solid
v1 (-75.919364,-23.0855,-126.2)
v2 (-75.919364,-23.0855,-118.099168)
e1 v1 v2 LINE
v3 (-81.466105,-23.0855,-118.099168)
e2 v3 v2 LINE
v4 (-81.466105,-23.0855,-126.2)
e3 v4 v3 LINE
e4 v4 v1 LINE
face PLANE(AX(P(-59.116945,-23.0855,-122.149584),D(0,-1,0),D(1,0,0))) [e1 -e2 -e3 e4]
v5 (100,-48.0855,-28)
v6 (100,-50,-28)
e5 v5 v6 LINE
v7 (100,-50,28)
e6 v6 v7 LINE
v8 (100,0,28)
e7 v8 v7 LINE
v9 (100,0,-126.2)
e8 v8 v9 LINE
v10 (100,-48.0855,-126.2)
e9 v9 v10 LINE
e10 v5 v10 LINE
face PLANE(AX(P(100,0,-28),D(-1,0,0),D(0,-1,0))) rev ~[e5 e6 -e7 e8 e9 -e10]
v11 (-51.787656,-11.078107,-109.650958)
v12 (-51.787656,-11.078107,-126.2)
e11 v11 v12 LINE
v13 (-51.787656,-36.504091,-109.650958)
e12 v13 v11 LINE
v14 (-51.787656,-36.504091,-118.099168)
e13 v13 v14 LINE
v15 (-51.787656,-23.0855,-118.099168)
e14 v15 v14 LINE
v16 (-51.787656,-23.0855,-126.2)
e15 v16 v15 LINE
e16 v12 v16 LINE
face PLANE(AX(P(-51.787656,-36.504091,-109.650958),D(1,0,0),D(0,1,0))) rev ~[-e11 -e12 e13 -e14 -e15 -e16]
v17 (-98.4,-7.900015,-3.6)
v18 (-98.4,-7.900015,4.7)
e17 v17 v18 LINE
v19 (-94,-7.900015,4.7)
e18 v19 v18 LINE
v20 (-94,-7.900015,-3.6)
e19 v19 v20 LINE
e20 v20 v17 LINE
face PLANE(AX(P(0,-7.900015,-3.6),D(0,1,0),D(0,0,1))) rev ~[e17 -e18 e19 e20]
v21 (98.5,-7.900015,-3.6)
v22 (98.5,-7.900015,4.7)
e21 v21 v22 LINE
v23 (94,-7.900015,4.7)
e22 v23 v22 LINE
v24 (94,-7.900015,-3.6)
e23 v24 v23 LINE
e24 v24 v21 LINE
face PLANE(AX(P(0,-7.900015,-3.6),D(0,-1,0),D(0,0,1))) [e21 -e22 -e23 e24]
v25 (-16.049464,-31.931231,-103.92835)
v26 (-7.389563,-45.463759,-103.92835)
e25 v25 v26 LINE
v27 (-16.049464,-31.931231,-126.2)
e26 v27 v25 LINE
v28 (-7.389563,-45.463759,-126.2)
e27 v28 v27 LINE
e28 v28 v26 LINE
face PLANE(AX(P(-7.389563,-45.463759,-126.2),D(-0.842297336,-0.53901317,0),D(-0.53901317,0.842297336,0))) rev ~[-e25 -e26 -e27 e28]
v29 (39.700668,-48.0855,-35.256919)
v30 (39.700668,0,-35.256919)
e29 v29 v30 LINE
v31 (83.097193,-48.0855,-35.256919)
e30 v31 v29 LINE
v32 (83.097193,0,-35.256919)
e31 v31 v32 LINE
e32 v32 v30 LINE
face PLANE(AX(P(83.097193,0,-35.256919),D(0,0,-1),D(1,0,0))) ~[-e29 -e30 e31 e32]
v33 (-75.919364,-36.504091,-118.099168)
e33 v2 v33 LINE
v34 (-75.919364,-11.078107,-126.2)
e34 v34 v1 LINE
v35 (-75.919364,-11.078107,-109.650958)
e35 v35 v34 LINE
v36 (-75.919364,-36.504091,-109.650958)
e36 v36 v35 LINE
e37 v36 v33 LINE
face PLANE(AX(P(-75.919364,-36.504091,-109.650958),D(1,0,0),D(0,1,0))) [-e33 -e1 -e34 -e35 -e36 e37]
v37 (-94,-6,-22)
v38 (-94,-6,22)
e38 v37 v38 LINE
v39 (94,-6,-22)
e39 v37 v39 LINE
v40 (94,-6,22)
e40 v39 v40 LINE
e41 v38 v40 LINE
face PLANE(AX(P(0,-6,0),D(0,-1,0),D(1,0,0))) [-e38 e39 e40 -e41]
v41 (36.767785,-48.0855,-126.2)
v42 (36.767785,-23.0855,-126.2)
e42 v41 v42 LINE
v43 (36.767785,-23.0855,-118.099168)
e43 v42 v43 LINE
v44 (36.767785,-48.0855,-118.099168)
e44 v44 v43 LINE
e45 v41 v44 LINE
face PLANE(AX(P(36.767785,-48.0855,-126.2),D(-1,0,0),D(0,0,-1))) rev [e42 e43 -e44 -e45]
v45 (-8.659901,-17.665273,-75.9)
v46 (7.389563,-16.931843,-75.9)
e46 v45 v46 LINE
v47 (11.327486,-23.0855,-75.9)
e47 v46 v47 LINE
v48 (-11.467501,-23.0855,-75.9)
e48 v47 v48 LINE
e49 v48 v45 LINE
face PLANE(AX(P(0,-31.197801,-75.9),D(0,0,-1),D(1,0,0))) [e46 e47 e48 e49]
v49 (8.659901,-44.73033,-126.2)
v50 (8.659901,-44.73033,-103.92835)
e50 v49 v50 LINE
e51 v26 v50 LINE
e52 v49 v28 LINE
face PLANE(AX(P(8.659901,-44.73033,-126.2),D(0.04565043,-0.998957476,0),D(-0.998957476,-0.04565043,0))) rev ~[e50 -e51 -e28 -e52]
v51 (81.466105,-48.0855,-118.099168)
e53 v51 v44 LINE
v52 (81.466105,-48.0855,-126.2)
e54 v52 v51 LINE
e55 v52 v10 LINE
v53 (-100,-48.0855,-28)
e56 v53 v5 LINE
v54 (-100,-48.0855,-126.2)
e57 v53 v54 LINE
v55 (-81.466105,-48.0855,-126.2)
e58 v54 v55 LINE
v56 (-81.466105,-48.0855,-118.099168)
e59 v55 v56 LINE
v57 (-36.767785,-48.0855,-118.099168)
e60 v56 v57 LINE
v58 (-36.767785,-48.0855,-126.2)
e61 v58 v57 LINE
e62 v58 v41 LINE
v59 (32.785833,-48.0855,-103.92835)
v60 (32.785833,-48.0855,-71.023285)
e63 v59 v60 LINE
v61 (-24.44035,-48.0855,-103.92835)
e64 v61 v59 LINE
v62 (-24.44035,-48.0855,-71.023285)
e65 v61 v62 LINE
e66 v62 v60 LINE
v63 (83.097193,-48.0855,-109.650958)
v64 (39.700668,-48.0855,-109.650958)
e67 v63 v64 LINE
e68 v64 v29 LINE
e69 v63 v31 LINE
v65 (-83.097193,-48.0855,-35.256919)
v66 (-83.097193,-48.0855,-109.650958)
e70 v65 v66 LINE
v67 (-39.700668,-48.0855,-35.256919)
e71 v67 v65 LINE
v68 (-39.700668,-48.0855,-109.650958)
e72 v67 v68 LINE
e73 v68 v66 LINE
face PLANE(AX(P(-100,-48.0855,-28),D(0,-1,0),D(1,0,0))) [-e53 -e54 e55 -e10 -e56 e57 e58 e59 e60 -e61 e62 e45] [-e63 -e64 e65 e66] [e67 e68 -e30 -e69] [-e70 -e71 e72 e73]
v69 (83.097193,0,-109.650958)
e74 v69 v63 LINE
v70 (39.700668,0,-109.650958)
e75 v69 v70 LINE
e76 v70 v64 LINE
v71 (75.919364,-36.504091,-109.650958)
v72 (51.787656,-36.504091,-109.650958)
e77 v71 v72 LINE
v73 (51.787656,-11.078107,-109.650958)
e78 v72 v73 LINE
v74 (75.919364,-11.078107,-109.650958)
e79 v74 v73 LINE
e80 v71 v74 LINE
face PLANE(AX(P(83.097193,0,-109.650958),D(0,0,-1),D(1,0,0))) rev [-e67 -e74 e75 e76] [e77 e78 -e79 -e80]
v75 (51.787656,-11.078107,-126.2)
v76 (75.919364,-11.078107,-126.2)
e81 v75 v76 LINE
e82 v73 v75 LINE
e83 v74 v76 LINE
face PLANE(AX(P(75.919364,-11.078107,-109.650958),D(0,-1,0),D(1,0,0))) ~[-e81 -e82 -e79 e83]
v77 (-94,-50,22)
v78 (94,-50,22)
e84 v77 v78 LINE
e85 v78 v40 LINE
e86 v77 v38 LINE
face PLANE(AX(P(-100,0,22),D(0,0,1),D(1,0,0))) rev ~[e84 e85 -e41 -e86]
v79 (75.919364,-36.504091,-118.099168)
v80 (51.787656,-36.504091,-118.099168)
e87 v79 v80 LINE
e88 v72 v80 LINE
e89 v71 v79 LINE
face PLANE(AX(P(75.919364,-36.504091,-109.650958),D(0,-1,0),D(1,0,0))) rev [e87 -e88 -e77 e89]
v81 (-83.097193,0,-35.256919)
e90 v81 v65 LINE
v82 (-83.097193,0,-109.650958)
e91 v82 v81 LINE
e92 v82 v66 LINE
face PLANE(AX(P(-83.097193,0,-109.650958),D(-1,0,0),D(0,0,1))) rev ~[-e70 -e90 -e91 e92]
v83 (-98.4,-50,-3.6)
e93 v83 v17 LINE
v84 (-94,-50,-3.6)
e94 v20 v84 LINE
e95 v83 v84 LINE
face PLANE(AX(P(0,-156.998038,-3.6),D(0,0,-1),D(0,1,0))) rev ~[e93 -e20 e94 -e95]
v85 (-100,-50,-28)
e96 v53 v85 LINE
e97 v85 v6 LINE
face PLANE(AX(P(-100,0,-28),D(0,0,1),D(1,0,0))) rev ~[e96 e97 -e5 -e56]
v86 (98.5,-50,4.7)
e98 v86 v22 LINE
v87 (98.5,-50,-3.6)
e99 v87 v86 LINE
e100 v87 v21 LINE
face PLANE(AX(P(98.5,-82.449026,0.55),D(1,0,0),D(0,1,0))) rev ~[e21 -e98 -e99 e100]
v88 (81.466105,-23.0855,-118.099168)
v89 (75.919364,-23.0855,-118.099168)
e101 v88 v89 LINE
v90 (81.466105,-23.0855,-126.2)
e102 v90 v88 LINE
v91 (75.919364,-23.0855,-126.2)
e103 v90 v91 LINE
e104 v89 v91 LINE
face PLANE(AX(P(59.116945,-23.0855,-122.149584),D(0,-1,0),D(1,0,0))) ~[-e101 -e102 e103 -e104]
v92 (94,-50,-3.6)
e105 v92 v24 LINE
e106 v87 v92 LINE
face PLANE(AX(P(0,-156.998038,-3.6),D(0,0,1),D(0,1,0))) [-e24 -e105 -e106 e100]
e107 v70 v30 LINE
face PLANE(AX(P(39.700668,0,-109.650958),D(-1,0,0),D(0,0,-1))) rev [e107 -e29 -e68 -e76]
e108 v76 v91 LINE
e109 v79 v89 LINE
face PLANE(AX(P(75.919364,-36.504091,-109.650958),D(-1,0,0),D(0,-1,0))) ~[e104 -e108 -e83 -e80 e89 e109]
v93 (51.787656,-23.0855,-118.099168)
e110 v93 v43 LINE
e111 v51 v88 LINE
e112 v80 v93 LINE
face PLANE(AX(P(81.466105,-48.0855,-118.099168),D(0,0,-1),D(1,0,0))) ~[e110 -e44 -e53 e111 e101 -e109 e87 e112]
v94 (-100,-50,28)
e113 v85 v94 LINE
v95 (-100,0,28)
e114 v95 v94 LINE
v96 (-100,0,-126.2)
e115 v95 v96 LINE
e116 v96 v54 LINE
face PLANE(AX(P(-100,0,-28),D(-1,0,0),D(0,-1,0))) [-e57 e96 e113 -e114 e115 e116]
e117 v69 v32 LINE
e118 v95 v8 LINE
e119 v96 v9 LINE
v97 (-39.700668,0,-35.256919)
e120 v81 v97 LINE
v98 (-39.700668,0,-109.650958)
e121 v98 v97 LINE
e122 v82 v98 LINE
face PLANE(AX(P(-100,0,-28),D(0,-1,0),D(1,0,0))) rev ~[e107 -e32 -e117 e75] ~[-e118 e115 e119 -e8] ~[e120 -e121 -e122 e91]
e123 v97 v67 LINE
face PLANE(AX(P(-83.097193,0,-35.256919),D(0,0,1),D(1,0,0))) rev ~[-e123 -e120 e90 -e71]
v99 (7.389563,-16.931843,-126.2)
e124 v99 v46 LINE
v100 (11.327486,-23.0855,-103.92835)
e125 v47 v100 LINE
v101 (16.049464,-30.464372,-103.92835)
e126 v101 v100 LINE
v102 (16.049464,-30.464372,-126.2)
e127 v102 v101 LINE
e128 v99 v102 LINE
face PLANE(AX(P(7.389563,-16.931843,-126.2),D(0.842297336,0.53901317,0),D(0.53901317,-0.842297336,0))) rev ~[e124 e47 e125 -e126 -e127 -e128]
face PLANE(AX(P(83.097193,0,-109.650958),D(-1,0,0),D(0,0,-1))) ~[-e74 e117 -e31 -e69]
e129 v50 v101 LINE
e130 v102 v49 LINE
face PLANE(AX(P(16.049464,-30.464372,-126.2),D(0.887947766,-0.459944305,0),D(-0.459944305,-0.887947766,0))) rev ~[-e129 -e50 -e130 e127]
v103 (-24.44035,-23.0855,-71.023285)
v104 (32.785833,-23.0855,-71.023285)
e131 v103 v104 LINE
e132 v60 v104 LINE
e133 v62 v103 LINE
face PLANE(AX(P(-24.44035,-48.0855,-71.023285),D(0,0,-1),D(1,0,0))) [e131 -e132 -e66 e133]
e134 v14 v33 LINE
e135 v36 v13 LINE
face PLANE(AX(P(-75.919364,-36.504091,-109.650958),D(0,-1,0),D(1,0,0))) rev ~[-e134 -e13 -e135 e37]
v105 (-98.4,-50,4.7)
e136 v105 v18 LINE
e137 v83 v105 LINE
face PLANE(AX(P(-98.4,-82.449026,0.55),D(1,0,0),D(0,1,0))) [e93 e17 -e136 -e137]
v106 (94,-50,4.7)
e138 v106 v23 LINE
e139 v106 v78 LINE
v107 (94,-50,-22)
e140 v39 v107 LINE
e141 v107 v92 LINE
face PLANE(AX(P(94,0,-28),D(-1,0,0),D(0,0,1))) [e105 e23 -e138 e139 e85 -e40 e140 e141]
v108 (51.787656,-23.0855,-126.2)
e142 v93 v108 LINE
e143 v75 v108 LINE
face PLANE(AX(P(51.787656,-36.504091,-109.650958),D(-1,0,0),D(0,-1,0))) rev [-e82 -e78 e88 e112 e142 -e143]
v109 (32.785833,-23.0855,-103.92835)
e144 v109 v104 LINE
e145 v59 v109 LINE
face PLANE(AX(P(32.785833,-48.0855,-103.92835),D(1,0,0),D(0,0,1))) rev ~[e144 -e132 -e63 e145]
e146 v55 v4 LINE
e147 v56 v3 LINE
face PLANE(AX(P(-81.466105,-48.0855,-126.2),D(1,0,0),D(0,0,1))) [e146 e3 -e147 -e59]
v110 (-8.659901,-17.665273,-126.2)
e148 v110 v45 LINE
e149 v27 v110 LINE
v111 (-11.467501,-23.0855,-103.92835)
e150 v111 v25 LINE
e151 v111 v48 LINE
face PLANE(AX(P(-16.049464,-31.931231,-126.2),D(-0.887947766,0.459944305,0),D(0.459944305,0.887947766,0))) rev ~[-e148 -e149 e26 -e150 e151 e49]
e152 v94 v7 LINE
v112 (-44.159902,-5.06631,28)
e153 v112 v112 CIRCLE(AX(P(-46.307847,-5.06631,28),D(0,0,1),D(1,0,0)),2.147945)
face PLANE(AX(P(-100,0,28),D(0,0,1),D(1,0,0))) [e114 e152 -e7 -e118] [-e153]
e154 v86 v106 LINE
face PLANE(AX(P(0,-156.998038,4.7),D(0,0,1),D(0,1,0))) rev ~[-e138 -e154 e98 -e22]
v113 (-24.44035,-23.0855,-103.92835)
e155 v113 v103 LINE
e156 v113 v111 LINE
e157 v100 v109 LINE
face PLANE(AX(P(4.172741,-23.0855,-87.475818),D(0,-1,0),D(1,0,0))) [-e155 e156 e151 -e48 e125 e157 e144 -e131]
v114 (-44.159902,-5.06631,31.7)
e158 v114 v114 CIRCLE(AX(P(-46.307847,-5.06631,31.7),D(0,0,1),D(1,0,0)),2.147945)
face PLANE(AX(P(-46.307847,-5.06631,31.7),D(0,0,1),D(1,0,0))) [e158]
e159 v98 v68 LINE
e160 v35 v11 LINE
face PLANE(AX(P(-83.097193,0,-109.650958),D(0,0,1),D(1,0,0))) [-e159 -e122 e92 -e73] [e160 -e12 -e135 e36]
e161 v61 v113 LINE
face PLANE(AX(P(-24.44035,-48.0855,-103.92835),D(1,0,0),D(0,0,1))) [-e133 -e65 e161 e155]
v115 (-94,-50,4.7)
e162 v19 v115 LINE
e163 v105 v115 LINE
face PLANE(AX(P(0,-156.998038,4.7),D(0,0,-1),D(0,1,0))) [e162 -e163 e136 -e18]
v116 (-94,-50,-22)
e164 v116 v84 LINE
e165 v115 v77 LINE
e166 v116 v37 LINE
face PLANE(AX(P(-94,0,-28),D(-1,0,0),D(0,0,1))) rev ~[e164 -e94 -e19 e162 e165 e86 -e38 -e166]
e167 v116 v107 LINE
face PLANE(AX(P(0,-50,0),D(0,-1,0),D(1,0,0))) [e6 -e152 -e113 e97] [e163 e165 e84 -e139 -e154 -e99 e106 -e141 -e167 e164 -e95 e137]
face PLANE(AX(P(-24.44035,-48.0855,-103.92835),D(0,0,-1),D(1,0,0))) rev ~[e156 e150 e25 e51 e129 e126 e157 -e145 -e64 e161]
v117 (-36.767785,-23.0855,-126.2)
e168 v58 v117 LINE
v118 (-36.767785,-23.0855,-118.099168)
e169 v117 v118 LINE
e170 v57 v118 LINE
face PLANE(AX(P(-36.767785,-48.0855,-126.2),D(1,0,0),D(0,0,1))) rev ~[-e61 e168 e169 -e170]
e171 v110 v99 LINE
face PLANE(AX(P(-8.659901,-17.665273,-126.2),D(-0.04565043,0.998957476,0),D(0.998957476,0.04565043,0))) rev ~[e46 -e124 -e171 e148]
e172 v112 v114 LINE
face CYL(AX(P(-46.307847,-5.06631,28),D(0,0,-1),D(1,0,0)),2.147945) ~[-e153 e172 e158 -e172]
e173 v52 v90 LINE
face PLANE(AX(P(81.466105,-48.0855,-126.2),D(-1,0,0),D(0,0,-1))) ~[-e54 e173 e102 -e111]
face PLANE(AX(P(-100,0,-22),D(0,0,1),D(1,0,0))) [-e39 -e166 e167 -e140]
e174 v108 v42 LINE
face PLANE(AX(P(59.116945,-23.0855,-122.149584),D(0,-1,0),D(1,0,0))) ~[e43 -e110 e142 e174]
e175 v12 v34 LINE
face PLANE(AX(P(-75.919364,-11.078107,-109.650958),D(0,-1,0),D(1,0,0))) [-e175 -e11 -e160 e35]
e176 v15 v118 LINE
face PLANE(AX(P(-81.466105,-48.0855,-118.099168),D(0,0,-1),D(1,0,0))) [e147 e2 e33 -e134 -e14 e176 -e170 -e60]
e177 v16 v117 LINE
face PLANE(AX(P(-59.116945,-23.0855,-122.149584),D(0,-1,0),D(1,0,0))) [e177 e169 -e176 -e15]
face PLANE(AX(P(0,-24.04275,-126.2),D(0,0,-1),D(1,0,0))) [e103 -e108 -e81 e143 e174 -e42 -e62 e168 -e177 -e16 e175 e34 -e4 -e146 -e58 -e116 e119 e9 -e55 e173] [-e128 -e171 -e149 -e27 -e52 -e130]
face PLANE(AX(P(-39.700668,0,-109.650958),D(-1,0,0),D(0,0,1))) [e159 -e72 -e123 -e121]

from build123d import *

# Parameters (mm, degrees)
F0_W           = 200
F0_H           = 56
F1_DEPTH       = 50
F2_T           = -6
F3_W           = 149.0980237722
F3_H           = 8.3
F4_DEPTH       = 98.5
F4_DEPTH_BACK  = 98.4
F5_R           = 2.1479446761
F6_DEPTH       = 3.7
F7_W           = 200
F7_H           = 48.0854995549
F8_DEPTH       = 98.2
F9_W           = 44.6983203292
F9_H           = 8.100832057
F10_DEPTH      = 25
F11_W          = 43.396525085
F11_H          = 74.3940398097
F12_DEPTH      = 55.1
F12_DEPTH_BACK = 75
F13_W          = 24.1317078471
F13_H          = 25.4259835929
F14_DEPTH      = 29.4
F16_DEPTH      = 50.3
F17_W          = 57.2261828929
F17_H          = 32.9050645232
F18_DEPTH      = 25


# Not quite as in the source:
# - a pattern or mirror of a feature is missing from the dataset's text; its kind, count and spacing are read off the source's solid


with BuildPart() as f1:
    # F0 (on Front) → F1 (new body)
    with BuildSketch(Plane.XZ):
        Rectangle(F0_W, F0_H)
    extrude(amount=F1_DEPTH)

    # F2
    f2_openings = [f1.faces().sort_by_distance(p)[0] for p in [
        (0, -50, 0),
    ]]
    offset(amount=F2_T, openings=f2_openings)

    # F3 (on Right) → F4 (cut, two sides)
    with BuildSketch(Plane.YZ) as f4_sk:
        with Locations((-82.4490264058, 0.55)):
            Rectangle(F3_W, F3_H)
    extrude(amount=F4_DEPTH, mode=Mode.SUBTRACT)
    extrude(f4_sk.sketch, amount=-F4_DEPTH_BACK, mode=Mode.SUBTRACT)

    # F5 (on face) → F6 (join)
    with BuildSketch(Plane.XY.offset(28)):
        with Locations((-46.3078469038, -5.0663095899)):
            Circle(F5_R)
    extrude(amount=F6_DEPTH)

    # F7 (on face) → F8 (join)
    with BuildSketch(Plane(origin=(0, 0, -28), x_dir=(1, 0, 0), z_dir=(0, 0, -1))):
        with Locations((0, 24.0427497774)):
            Rectangle(F7_W, F7_H)
    extrude(amount=F8_DEPTH)

    # F9 (on face) → F10 (cut)
    with BuildSketch(Plane.XZ.offset(48.0854995549)):
        with Locations((-59.1169446707, -122.1495839715)):
            Rectangle(F9_W, F9_H)
    f10 = extrude(amount=-F10_DEPTH, mode=Mode.SUBTRACT)

    # F10_copies: F10 across plane
    add(f10.mirror(Plane(origin=(0, 0, 0), x_dir=(0, 0, 1), z_dir=(1, 0, 0))), mode=Mode.SUBTRACT)

    # F11 (on Front) → F12 (cut, two sides)
    with BuildSketch(Plane.XZ) as f12_sk:
        with Locations((-61.3989308476, -72.4539384246)):
            Rectangle(F11_W, F11_H)
    f12 = extrude(amount=-F12_DEPTH, mode=Mode.SUBTRACT) + extrude(f12_sk.sketch, amount=F12_DEPTH_BACK, mode=Mode.SUBTRACT)

    # F12_copies: F12 across plane
    add(f12.mirror(Plane(origin=(0, 0, 0), x_dir=(0, 0, 1), z_dir=(1, 0, 0))), mode=Mode.SUBTRACT)

    # F13 (on face) → F14 (cut)
    with BuildSketch(Plane.XY.offset(-109.6509583294)):
        with Locations((-63.8535097241, -23.7910989672)):
            Rectangle(F13_W, F13_H)
    f14 = extrude(amount=-F14_DEPTH, mode=Mode.SUBTRACT)

    # F14_copies: F14 across plane
    add(f14.mirror(Plane(origin=(0, 0, 0), x_dir=(0, 0, 1), z_dir=(1, 0, 0))), mode=Mode.SUBTRACT)

    # F15 (on face) → F16 (cut)
    with BuildSketch(Plane(origin=(0, 0, -126.2), x_dir=(1, 0, 0), z_dir=(0, 0, -1))):
        Polygon((16.0494638515, 30.4643716825), (8.6599005478, 44.7303298699), (-7.3895633037, 45.4637594198), (-16.0494638515, 31.9312307822), (-8.6599005478, 17.6652725948), (7.3895633037, 16.9318430449), align=None)
    extrude(amount=-F16_DEPTH, mode=Mode.SUBTRACT)

    # F17 (on face) → F18 (cut)
    with BuildSketch(Plane.XZ.offset(48.0854995549)):
        with Locations((4.1727414355, -87.4758176506)):
            Rectangle(F17_W, F17_H)
    extrude(amount=-F18_DEPTH, mode=Mode.SUBTRACT)


solid = f1.part
